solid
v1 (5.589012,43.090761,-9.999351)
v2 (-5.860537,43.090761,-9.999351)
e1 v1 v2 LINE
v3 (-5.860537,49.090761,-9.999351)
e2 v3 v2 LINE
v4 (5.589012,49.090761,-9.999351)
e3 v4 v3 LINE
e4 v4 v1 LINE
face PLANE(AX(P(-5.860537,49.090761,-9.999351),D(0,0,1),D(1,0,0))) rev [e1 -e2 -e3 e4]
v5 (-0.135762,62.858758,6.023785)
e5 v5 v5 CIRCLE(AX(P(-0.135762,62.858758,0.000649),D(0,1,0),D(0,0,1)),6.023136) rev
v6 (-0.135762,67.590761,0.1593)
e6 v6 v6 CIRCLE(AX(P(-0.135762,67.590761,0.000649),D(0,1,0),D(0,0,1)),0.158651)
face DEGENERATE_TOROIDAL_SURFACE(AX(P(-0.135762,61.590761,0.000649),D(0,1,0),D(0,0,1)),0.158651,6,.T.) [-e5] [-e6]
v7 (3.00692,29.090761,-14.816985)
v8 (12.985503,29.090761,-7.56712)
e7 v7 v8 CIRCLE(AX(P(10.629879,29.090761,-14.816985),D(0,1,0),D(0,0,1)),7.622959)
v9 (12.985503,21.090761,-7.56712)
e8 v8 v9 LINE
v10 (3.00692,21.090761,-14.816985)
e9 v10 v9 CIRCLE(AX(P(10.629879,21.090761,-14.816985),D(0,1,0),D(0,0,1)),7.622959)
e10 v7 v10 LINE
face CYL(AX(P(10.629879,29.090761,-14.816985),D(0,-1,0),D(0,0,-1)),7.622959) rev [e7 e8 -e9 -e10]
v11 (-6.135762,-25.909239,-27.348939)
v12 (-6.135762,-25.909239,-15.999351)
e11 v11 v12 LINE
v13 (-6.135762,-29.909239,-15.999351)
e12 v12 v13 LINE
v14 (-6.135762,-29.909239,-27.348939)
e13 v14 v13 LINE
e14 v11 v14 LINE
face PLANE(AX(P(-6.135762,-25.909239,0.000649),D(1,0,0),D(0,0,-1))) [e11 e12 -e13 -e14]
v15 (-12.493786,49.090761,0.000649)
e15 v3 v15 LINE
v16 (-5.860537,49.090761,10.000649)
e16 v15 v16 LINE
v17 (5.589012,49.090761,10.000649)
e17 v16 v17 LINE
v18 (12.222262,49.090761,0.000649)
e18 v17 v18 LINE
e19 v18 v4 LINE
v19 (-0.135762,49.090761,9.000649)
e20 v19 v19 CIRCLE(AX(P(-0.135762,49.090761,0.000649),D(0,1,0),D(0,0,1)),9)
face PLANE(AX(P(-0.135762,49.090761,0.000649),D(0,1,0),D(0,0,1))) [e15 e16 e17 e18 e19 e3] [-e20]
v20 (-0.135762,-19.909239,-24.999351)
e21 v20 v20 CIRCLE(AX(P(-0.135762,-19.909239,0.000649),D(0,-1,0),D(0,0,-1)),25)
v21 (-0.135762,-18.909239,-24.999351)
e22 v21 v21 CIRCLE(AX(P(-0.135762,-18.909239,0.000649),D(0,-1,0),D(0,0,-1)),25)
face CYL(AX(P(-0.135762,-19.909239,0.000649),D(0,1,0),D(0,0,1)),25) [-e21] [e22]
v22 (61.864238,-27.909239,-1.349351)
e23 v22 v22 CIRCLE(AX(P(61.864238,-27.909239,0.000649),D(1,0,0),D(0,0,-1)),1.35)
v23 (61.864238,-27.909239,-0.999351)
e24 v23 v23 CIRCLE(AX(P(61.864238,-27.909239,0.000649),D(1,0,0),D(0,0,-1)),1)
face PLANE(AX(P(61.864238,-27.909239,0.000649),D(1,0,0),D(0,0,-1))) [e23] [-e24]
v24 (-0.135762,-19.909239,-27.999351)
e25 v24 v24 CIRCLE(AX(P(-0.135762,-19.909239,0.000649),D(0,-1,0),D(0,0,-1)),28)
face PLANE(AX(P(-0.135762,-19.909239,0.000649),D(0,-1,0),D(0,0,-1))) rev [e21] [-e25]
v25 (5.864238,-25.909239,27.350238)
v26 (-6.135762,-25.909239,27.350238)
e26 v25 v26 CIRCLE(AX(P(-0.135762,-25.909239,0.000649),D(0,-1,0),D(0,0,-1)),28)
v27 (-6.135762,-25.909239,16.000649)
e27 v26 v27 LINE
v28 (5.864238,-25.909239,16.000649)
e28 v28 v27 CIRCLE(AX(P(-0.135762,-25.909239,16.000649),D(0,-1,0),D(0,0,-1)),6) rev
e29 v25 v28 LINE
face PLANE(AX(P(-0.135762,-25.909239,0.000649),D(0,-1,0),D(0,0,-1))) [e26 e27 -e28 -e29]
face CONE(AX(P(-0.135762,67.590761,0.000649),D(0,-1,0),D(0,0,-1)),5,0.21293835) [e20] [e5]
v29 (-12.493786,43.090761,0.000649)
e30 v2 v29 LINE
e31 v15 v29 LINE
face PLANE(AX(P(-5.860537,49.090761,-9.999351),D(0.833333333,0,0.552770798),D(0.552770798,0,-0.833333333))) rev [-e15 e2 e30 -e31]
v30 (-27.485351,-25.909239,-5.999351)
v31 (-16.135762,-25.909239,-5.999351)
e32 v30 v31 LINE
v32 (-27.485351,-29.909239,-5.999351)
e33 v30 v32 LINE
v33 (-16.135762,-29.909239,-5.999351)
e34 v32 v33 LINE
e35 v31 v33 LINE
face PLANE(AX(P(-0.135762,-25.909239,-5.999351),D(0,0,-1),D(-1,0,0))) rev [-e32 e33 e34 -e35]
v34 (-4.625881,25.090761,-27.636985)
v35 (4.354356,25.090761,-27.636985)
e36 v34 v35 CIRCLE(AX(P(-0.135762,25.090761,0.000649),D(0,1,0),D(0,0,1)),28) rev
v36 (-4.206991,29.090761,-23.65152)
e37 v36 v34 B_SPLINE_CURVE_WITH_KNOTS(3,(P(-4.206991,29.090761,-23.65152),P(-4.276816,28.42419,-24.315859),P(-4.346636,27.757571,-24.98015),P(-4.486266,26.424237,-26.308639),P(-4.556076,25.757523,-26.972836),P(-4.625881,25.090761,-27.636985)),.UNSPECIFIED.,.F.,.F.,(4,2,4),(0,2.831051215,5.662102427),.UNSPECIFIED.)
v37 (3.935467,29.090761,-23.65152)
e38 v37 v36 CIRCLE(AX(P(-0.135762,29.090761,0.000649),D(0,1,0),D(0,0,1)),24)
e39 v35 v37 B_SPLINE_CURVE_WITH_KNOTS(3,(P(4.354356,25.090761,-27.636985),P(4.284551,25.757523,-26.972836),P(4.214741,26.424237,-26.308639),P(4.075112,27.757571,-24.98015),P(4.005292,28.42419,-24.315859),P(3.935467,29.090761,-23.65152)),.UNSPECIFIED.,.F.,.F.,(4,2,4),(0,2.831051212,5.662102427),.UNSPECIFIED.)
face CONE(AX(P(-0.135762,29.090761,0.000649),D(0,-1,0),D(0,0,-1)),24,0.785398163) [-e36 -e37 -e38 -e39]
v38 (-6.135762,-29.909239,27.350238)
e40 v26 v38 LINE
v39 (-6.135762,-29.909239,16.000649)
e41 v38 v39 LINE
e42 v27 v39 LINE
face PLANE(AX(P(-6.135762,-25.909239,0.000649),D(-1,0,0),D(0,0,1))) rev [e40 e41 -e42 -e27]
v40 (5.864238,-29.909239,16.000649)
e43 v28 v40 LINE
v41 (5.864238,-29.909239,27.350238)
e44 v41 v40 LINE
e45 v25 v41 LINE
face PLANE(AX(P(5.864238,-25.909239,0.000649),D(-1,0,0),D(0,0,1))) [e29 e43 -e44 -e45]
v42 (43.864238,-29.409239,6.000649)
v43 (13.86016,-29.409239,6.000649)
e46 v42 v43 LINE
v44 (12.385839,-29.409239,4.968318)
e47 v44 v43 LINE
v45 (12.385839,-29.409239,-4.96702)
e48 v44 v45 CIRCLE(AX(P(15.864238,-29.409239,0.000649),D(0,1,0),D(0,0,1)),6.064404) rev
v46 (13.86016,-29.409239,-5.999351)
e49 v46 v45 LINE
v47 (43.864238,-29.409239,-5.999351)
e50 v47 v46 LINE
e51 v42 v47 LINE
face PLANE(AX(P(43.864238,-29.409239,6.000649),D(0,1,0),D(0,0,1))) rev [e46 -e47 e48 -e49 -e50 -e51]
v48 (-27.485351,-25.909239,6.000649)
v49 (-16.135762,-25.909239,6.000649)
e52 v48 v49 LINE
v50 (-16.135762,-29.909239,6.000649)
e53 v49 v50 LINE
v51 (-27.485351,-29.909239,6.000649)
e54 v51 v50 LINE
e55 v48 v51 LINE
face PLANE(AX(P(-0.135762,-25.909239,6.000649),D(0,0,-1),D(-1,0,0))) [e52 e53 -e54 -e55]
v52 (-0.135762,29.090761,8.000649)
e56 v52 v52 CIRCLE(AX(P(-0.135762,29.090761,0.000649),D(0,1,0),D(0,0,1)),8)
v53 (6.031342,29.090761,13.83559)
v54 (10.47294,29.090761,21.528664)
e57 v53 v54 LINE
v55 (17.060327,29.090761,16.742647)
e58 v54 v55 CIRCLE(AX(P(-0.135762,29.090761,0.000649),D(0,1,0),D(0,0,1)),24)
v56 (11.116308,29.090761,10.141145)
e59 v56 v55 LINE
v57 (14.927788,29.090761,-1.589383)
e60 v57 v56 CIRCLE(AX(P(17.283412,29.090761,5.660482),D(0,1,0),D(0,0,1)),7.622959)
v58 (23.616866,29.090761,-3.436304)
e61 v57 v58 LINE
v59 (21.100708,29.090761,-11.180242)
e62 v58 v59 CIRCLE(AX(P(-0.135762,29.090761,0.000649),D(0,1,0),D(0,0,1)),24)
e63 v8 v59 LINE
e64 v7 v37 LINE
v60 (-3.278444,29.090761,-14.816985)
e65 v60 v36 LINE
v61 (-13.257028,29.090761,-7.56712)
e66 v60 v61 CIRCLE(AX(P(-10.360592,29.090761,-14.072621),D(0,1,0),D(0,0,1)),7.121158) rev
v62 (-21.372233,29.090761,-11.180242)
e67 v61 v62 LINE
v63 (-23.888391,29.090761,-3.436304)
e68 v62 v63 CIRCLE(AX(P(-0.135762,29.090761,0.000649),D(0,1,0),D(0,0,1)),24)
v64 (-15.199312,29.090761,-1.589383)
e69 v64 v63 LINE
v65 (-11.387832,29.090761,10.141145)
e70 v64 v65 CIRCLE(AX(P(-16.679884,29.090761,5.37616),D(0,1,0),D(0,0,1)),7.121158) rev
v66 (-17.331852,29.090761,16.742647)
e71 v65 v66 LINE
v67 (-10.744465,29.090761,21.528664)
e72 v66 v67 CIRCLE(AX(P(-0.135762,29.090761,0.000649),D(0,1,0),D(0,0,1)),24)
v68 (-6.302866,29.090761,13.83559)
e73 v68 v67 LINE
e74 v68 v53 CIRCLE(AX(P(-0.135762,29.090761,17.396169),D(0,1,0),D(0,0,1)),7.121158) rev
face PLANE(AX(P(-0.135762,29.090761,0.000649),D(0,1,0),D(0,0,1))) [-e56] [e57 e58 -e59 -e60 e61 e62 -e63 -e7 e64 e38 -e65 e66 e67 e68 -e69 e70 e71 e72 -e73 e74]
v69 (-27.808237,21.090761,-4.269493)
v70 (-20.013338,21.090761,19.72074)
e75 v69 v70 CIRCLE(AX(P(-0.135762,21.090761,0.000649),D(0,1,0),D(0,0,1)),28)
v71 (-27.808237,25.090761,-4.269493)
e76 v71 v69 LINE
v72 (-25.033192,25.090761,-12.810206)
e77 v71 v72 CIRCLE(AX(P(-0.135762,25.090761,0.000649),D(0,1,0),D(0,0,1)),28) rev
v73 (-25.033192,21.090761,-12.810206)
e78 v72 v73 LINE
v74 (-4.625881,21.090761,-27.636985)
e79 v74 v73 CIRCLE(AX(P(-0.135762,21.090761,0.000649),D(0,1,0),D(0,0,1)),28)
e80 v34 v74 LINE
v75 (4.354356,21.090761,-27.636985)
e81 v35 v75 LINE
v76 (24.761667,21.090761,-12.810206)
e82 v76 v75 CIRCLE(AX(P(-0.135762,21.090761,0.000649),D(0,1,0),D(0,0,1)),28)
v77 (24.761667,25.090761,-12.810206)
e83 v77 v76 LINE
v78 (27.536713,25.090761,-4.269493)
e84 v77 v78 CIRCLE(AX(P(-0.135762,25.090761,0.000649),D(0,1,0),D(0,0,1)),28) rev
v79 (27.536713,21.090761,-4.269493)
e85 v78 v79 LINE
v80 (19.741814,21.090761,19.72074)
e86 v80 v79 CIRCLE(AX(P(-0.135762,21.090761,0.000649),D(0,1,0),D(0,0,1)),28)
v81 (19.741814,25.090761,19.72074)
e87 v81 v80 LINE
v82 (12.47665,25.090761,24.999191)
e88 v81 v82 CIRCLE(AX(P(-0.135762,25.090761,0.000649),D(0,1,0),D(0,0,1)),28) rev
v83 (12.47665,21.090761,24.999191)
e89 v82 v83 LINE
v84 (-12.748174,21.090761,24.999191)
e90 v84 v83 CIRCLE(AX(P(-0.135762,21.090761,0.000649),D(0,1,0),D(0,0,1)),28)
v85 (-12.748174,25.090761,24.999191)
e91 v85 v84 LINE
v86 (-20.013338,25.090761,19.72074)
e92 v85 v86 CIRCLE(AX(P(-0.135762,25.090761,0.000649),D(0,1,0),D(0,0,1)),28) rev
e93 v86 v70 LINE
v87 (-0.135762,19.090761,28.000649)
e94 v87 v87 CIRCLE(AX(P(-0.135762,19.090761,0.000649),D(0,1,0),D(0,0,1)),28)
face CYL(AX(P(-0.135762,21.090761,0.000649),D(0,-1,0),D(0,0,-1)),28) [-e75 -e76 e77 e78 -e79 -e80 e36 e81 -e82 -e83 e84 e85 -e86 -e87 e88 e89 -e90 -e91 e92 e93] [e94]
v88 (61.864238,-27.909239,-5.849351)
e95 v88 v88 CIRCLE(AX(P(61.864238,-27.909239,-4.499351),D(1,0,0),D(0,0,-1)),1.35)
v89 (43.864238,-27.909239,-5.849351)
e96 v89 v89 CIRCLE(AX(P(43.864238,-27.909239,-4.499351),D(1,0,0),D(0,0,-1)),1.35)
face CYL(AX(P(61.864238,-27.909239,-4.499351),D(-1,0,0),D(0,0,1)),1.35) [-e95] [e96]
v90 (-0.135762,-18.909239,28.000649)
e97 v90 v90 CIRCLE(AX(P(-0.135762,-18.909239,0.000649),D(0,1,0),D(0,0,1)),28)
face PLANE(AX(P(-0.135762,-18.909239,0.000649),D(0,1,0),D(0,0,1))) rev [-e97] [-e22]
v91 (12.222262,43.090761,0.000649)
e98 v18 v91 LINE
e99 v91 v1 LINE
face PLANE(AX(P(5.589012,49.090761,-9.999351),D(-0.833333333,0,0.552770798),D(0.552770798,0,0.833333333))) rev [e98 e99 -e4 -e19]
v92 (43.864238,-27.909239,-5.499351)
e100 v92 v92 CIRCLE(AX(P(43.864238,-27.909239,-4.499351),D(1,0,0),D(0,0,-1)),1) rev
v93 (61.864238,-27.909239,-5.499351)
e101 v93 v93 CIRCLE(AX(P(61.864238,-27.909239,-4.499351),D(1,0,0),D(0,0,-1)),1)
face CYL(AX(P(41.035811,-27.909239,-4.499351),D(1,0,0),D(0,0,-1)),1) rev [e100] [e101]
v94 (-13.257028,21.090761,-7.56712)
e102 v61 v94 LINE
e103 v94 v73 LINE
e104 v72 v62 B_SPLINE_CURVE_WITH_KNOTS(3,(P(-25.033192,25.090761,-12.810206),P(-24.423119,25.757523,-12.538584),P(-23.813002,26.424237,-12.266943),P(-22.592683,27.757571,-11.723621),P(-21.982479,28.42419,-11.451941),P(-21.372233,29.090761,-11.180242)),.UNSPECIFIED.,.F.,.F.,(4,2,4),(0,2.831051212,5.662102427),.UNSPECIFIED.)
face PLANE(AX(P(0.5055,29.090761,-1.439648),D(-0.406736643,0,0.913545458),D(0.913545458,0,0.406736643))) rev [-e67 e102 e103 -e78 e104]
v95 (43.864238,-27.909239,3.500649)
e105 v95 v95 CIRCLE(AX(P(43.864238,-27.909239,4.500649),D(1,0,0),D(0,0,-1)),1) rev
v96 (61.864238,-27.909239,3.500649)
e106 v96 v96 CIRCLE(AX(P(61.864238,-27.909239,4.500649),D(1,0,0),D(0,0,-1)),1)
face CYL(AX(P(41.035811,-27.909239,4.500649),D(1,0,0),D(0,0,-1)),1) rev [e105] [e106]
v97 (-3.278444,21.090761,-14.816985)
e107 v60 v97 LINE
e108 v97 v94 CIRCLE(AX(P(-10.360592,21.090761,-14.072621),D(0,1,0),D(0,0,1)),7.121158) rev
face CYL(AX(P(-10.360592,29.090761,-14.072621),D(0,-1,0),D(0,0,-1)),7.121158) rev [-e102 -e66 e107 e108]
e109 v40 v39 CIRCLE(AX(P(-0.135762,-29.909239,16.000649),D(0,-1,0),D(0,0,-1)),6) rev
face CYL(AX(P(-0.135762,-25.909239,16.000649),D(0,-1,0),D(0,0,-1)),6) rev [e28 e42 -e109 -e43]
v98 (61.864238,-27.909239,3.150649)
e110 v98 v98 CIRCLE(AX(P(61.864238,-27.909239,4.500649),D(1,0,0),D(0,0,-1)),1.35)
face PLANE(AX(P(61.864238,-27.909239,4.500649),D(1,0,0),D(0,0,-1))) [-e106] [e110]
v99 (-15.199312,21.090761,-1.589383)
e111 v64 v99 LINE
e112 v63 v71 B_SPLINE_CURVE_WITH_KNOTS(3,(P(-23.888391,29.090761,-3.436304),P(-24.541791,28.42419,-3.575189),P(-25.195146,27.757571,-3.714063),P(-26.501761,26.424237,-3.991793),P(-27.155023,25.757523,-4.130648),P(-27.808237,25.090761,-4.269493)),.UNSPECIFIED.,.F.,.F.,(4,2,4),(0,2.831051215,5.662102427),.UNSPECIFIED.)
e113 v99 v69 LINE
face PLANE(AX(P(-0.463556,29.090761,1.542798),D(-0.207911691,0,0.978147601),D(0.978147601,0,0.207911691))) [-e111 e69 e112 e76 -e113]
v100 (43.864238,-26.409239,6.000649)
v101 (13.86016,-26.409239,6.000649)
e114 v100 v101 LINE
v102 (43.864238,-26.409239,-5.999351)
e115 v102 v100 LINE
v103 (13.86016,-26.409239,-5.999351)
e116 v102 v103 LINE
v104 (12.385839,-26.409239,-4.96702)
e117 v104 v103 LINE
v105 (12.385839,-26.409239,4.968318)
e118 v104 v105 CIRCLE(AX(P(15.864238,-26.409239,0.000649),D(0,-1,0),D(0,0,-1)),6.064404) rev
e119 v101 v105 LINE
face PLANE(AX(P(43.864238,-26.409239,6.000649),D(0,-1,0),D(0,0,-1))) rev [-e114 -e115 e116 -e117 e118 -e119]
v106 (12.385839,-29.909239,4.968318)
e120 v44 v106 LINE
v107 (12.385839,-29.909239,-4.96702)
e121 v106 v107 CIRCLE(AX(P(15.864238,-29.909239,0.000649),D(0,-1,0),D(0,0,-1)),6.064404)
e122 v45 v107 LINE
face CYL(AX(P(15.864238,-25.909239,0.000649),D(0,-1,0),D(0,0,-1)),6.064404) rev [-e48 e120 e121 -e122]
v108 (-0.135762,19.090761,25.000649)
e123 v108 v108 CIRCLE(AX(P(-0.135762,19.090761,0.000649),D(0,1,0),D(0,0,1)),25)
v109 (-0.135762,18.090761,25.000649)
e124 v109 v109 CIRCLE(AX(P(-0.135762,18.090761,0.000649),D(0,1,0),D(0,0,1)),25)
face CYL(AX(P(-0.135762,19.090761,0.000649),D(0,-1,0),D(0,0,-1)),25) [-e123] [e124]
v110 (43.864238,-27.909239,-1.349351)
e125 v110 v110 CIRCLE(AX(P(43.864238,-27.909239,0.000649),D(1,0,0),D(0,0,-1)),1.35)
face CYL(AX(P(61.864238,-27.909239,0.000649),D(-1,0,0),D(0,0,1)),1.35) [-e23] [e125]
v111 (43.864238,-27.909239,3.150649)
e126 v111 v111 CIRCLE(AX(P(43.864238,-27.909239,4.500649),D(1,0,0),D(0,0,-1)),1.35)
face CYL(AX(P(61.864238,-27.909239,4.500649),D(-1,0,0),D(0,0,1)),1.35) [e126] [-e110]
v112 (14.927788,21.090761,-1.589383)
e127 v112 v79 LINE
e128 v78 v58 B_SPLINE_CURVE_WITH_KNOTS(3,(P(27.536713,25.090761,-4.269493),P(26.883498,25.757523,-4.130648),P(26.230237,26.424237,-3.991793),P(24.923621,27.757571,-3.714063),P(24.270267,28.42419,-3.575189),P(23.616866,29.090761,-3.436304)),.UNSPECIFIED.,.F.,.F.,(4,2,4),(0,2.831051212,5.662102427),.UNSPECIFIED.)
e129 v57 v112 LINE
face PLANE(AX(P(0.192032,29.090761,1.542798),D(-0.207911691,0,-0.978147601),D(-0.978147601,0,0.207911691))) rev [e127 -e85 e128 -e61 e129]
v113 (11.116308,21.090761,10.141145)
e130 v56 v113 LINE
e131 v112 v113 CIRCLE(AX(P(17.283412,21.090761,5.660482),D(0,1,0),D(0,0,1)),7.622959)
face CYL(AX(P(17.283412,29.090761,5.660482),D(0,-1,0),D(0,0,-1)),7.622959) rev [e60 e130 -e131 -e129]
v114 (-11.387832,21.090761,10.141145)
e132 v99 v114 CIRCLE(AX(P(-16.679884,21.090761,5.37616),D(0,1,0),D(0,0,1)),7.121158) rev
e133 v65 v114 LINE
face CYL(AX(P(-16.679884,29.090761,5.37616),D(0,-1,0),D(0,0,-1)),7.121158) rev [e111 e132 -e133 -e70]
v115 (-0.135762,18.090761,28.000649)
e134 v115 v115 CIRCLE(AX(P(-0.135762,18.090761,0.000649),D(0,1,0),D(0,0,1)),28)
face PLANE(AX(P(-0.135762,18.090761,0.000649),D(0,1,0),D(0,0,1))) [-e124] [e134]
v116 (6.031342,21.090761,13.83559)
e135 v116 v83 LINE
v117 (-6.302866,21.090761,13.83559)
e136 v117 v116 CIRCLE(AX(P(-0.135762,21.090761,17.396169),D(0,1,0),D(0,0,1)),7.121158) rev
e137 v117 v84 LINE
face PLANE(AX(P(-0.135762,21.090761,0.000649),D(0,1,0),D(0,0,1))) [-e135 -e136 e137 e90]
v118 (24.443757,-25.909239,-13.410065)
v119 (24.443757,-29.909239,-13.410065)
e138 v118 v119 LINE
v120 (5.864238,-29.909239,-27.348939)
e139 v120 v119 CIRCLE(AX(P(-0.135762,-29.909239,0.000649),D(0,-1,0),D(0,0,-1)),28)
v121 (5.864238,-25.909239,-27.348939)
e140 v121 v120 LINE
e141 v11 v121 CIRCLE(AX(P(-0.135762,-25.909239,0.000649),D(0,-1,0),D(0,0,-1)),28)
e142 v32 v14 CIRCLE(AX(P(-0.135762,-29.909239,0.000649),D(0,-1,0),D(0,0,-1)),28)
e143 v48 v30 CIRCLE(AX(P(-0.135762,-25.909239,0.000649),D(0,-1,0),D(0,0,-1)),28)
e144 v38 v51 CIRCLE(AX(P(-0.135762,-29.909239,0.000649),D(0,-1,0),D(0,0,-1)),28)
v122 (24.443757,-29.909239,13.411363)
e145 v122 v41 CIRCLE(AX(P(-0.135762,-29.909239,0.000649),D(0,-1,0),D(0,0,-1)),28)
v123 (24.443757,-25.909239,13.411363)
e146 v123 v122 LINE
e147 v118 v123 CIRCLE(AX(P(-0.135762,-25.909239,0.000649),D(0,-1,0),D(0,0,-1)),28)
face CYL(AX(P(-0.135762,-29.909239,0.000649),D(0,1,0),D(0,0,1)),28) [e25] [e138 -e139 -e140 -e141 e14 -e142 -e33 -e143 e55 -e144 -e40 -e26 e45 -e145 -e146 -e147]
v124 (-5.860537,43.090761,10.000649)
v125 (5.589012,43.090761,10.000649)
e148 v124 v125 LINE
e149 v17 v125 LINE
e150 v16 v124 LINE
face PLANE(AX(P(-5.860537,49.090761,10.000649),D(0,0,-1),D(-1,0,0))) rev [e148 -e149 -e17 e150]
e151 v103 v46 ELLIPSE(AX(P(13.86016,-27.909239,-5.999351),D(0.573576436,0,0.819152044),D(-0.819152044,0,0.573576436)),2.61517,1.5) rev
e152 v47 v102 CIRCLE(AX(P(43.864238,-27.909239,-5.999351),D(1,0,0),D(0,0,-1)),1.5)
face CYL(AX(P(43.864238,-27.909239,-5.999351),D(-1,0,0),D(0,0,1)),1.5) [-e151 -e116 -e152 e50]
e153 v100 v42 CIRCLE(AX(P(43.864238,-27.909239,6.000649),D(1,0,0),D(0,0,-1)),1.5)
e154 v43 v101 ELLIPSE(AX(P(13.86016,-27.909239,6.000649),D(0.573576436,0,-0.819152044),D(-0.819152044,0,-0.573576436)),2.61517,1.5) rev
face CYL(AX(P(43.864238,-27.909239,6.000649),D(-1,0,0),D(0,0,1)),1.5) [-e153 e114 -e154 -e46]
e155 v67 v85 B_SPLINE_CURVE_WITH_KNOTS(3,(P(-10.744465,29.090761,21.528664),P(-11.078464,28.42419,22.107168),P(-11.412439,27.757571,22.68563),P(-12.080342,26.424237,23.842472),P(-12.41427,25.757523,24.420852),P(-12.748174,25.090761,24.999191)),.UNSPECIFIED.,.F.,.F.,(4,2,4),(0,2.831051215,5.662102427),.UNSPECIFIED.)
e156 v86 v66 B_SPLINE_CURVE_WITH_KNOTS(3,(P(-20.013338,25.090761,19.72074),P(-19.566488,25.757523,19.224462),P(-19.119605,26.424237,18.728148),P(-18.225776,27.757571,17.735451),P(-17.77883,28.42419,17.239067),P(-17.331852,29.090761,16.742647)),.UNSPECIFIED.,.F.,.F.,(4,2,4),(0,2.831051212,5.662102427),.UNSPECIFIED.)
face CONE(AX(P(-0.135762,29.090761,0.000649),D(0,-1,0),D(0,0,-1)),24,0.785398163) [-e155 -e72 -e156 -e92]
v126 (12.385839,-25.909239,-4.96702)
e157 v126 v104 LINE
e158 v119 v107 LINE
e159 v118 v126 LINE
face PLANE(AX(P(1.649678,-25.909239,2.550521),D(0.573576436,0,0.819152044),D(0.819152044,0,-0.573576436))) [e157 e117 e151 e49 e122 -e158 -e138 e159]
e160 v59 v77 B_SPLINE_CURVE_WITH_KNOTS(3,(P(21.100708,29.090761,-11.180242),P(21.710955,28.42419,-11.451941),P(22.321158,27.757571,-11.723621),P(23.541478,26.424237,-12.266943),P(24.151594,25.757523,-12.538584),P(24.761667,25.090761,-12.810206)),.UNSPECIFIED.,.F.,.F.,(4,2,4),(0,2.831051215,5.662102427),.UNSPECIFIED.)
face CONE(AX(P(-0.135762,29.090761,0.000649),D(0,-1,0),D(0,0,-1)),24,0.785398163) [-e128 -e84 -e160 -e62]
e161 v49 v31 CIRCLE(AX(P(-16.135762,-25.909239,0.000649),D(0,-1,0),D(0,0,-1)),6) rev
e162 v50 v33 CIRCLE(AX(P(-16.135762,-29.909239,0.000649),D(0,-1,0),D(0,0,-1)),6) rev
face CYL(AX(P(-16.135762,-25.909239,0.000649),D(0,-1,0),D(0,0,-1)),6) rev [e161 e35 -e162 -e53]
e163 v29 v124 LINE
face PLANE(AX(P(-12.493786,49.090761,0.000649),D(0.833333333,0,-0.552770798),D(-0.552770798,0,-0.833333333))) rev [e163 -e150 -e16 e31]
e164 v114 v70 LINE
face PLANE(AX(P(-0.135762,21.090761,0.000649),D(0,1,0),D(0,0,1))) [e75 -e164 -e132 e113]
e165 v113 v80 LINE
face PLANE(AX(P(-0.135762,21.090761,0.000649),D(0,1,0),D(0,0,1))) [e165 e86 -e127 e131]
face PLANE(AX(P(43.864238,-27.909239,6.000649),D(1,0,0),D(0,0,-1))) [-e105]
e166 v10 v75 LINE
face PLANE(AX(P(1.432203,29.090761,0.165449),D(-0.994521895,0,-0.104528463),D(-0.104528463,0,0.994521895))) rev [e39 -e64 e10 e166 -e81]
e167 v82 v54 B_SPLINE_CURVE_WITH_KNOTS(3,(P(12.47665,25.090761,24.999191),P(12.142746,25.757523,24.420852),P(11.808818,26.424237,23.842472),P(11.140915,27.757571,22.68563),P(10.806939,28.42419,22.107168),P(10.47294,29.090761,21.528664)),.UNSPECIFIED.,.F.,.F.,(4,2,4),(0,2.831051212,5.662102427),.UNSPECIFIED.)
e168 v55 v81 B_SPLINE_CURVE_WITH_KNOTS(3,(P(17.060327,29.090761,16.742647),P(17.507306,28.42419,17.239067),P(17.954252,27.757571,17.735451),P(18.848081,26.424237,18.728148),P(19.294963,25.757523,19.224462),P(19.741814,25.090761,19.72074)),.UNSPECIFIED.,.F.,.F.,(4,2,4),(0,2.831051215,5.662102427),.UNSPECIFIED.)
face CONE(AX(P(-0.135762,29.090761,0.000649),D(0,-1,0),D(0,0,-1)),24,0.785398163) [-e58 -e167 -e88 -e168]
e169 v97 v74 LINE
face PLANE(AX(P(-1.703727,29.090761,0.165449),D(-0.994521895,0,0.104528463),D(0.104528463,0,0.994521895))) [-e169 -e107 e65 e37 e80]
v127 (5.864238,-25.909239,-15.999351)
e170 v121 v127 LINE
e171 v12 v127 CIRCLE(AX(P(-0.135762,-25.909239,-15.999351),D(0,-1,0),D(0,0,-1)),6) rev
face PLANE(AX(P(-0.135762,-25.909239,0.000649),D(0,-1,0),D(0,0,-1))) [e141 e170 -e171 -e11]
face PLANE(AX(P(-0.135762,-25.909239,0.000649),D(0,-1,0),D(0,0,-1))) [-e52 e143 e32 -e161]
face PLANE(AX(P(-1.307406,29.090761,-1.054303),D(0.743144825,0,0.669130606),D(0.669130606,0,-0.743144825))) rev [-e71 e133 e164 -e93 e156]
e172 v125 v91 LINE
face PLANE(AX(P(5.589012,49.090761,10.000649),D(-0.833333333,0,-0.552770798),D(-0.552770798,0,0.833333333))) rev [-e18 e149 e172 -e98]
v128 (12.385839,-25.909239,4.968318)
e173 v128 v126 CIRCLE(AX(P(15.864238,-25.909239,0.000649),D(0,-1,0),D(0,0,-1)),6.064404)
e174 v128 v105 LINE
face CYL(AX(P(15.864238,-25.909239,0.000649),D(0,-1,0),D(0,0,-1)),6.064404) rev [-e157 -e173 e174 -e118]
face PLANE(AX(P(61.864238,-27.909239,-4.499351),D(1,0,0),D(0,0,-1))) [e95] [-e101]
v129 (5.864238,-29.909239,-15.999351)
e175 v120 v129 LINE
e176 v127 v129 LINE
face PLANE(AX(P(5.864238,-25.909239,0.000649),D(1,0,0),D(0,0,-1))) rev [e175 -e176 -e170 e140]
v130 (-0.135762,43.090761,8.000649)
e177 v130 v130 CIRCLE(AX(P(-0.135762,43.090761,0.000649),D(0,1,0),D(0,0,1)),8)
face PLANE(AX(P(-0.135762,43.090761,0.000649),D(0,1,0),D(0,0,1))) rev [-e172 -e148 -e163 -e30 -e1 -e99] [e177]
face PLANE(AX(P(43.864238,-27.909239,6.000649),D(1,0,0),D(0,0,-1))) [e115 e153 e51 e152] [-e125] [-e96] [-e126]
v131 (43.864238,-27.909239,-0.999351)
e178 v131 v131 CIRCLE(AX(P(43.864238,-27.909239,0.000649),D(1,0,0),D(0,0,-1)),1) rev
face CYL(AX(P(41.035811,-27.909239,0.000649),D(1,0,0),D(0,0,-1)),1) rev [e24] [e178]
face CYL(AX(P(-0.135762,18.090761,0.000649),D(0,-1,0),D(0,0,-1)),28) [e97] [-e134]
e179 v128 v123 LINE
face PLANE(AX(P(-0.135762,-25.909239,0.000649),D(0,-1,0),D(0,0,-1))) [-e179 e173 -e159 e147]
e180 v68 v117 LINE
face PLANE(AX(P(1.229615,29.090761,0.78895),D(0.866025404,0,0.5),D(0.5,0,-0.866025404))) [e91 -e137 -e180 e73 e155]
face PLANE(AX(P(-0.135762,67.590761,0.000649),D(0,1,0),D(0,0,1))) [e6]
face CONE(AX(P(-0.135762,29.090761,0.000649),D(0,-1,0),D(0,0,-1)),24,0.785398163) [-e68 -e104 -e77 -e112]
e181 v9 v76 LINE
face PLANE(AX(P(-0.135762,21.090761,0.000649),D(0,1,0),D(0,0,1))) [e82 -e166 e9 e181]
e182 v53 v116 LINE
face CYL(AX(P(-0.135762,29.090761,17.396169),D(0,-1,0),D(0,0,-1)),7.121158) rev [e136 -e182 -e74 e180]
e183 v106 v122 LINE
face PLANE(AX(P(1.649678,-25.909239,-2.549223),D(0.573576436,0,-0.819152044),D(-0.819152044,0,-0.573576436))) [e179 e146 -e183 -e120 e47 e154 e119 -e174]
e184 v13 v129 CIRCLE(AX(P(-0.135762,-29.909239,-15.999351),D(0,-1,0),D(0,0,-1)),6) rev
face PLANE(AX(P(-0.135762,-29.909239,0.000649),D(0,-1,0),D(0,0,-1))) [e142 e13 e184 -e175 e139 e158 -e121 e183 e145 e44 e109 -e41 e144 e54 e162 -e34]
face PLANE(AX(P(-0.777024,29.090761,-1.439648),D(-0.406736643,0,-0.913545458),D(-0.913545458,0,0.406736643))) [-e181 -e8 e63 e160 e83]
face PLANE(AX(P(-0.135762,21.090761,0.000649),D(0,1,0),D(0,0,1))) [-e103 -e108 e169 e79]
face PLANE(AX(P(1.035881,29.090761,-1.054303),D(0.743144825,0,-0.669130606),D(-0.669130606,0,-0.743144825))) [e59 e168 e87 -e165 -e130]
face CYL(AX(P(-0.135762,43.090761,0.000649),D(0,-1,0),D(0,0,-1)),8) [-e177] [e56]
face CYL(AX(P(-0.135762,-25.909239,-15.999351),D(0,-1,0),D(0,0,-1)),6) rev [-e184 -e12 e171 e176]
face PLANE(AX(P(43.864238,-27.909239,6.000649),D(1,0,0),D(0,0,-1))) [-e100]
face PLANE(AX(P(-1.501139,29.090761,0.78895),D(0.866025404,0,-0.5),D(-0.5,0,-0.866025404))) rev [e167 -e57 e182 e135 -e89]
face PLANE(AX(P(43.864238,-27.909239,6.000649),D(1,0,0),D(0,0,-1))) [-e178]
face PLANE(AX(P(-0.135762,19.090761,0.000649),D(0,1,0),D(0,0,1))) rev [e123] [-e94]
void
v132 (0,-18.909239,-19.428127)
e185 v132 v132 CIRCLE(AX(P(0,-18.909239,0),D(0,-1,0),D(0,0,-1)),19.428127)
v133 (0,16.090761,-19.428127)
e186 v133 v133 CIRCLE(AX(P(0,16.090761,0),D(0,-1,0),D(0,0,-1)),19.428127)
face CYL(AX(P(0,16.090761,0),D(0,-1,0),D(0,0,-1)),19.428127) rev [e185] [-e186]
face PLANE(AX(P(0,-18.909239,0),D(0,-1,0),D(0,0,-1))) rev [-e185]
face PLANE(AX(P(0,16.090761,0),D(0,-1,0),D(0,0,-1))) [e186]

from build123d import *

# Parameters (mm, degrees)
SKETCH1_R                = 14
BOSS_EXTRUDE1_DEPTH      = 9.25
SKETCH2_R                = 12.5
BOSS_EXTRUDE2_DEPTH      = 0.5
BOSS_EXTRUDE3_START      = 0.5
SKETCH3_R                = 12.5
BOSS_EXTRUDE3_DEPTH      = 0.5
SKETCH4_R                = 14
BOSS_EXTRUDE4_DEPTH      = 5
BOSS_EXTRUDE5_START      = 1
SKETCH5_R                = 14
BOSS_EXTRUDE5_DEPTH      = 1
BOSS_EXTRUDE6_START      = 4
SKETCH6_R                = 4
BOSS_EXTRUDE6_DEPTH      = 4
BOSS_EXTRUDE7_START      = 11
SKETCH7_R                = 4
BOSS_EXTRUDE7_DEPTH      = 11
FILLET4_SIZE             = 2
BOSS_EXTRUDE8_DEPTH      = 3
SKETCH10_R               = 4.5
SKETCH9_R                = 2.5
FILLET5_R                = 3
CUT_EXTRUDE1_START       = -2
CUT_EXTRUDE1_DEPTH       = 2
BOSS_EXTRUDE9_DEPTH      = 8
BOSS_EXTRUDE9_DEPTH_BACK = 17
SKETCH16_R               = 0.675
BOSS_EXTRUDE10_DEPTH     = 9
SKETCH18_R               = 0.5
CUT_EXTRUDE2_DEPTH       = 9
SCALE1_SCALE             = 2
SKETCH19_R               = 19.428126758
CUT_EXTRUDE3_DEPTH       = 35


with BuildPart() as part:
    # Sketch1 → Boss-Extrude1 (new, symmetric)
    with BuildSketch(Plane(origin=(0, 0, 0), x_dir=(1, 0, 0), z_dir=(0, 1, 0))):
        with Locations(Location((0, 0, 0), (0, 0, 270))):
            Circle(SKETCH1_R)
    extrude(amount=BOSS_EXTRUDE1_DEPTH, both=True)

    # Sketch2 → Boss-Extrude2 (add)
    with BuildSketch(Plane(origin=(0, 9.25, 0), x_dir=(1, 0, 0), z_dir=(0, 1, 0))):
        with Locations(Location((0, 0, 0), (0, 0, 270))):
            Circle(SKETCH2_R)
    extrude(amount=BOSS_EXTRUDE2_DEPTH)

    # Sketch3 → Boss-Extrude3 (add)
    with BuildSketch(Plane.XZ.offset(9.25).offset(BOSS_EXTRUDE3_START)):
        with Locations(Location((0, 0, 0), (0, 0, 90))):
            Circle(SKETCH3_R)
    extrude(amount=-BOSS_EXTRUDE3_DEPTH)

    # Sketch4 → Boss-Extrude4 (add)
    with BuildSketch(Plane.XZ.offset(9.75)):
        with Locations(Location((0, 0, 0), (0, 0, 90))):
            Circle(SKETCH4_R)
    extrude(amount=BOSS_EXTRUDE4_DEPTH)

    # Sketch5 → Boss-Extrude5 (add)
    with BuildSketch(Plane(origin=(0, 9.75, 0), x_dir=(1, 0, 0), z_dir=(0, 1, 0)).offset(BOSS_EXTRUDE5_START)):
        with Locations(Location((0, 0, 0), (0, 0, 270))):
            Circle(SKETCH5_R)
    extrude(amount=-BOSS_EXTRUDE5_DEPTH)

    # Sketch6 → Boss-Extrude6 (add)
    with BuildSketch(Plane(origin=(0, 10.75, 0), x_dir=(1, 0, 0), z_dir=(0, 1, 0)).offset(BOSS_EXTRUDE6_START)):
        with BuildLine():
            ThreePointArc((6.560632788, 3.783884599), (3.142489225, 4.325265354), (1.571341079, 7.408817209))
            Line((1.571341079, 7.408817209), (2.245059227, 13.818817209))
            ThreePointArc((2.245059227, 13.818817209), (0, 14), (-2.245059227, 13.818817209))
            Line((-2.245059227, 13.818817209), (-1.571341079, 7.408817209))
            ThreePointArc((-1.571341079, 7.408817209), (-3.019559024, 4.156066449), (-6.560632788, 3.783884599))
            Line((-6.560632788, 3.783884599), (-12.4487147, 6.405427568))
            ThreePointArc((-12.4487147, 6.405427568), (-13.314791228, 4.326237921), (-13.836237609, 2.135071152))
            Line((-13.836237609, 2.135071152), (-7.531774982, 0.795016253))
            ThreePointArc((-7.531774982, 0.795016253), (-4.885749132, -1.587476124), (-5.62603513, -5.070247918))
            Line((-5.62603513, -5.070247918), (-9.938788028, -9.86004526))
            ThreePointArc((-9.938788028, -9.86004526), (-8.228993532, -11.326237921), (-6.306205891, -12.499270669))
            Line((-6.306205891, -12.499270669), (-3.083551855, -6.917470143))
            ThreePointArc((-3.083551855, -6.917470143), (0, -5.13718065), (3.083551855, -6.917470143))
            Line((3.083551855, -6.917470143), (6.306205891, -12.499270669))
            ThreePointArc((6.306205891, -12.499270669), (8.228993532, -11.326237921), (9.938788028, -9.86004526))
            Line((9.938788028, -9.86004526), (5.62603513, -5.070247918))
            ThreePointArc((5.62603513, -5.070247918), (5.084654375, -1.652104355), (7.531774982, 0.795016253))
            Line((7.531774982, 0.795016253), (13.836237609, 2.135071152))
            ThreePointArc((13.836237609, 2.135071152), (13.314791228, 4.326237921), (12.4487147, 6.405427568))
            Line((12.4487147, 6.405427568), (6.560632788, 3.783884599))
        make_face()
        with Locations(Location((0, 0, 0), (0, 0, 270))):
            Circle(SKETCH6_R, mode=Mode.SUBTRACT)
    extrude(amount=-BOSS_EXTRUDE6_DEPTH)

    # Sketch7 → Boss-Extrude7 (add)
    with BuildSketch(Plane(origin=(0, 10.75, 0), x_dir=(1, 0, 0), z_dir=(0, 1, 0)).offset(BOSS_EXTRUDE7_START)):
        with Locations(Location((0, 0, 0), (0, 0, 270))):
            Circle(SKETCH7_R)
    extrude(amount=-BOSS_EXTRUDE7_DEPTH)

    # Fillet4
    fillet4_edges = [part.edges().sort_by_distance(p)[0] for p in [
        (0, 14.75, -14),
        (-13.314791228, 14.75, -4.326237921),
        (-8.228993532, 14.75, 11.326237921),
        (8.228993532, 14.75, 11.326237921),
        (13.314791228, 14.75, -4.326237921),
    ]]
    chamfer(fillet4_edges, length=FILLET4_SIZE)

    # Sketch8 → Boss-Extrude8 (add)
    with BuildSketch(Plane(origin=(0, 21.75, 0), x_dir=(1, 0, 0), z_dir=(0, 1, 0))):
        Polygon((-2.862387208, 5), (2.862387208, 5), (6.179011998, 0), (2.862387208, -5), (-2.862387208, -5), (-6.179011998, 0), align=None)
    extrude(amount=BOSS_EXTRUDE8_DEPTH)

    # Sketch10 → Loft1 section 0
    with BuildSketch(Plane(origin=(0, 24.75, 0), x_dir=(1, 0, 0), z_dir=(0, 1, 0))):
        Circle(SKETCH10_R)
    # Sketch9 → Loft1 section 1
    with BuildSketch(Plane(origin=(0, 34, 0), x_dir=(1, 0, 0), z_dir=(0, 1, 0))):
        Circle(SKETCH9_R)
    loft()

    # Fillet5
    fillet5_edges = [part.edges().sort_by_distance(p)[0] for p in [
        (-2.5, 34, 0),
    ]]
    fillet(fillet5_edges, radius=FILLET5_R)

    # Sketch12 → Cut-Extrude1 (cut)
    with BuildSketch(Plane.XZ.offset(14.75).offset(CUT_EXTRUDE1_START)):
        with BuildLine():
            ThreePointArc((3, 13.674794331), (0, 14), (-3, 13.674794331))
            Line((-3, 13.674794331), (-3, 8))
            ThreePointArc((-3, 8), (0, 5), (3, 8))
            Line((3, 8), (3, 13.674794331))
        make_face()
        with BuildLine():
            Line((-8, 3), (-13.674794331, 3))
            ThreePointArc((-13.674794331, 3), (-14, 0), (-13.674794331, -3))
            Line((-13.674794331, -3), (-8, -3))
            ThreePointArc((-8, -3), (-5, 0), (-8, 3))
        make_face()
        with BuildLine():
            Line((12.289759461, 6.705356992), (6.260800415, 2.483834421))
            ThreePointArc((6.260800415, 2.483834421), (4.967798056, 0), (6.260800415, -2.483834421))
            Line((6.260800415, -2.483834421), (12.289759461, -6.705356992))
            ThreePointArc((12.289759461, -6.705356992), (14, 0), (12.289759461, 6.705356992))
        make_face()
        with BuildLine():
            Line((-3, -8), (-3, -13.674794331))
            ThreePointArc((-3, -13.674794331), (0, -14), (3, -13.674794331))
            Line((3, -13.674794331), (3, -8))
            ThreePointArc((3, -8), (0, -5), (-3, -8))
        make_face()
    extrude(amount=CUT_EXTRUDE1_DEPTH, mode=Mode.SUBTRACT)

    # Sketch14 → Boss-Extrude9 (add, two sides: drawn at the far end of the back side and taken through both)
    with BuildSketch(Plane(origin=(14, 0, 0), x_dir=(0, 0, -1), z_dir=(1, 0, 0)).offset(-BOSS_EXTRUDE9_DEPTH_BACK)):
        with BuildLine():
            Line((-3, -13), (3, -13))
            ThreePointArc((3, -13), (3.75, -13.75), (3, -14.5))
            Line((3, -14.5), (-3, -14.5))
            ThreePointArc((-3, -14.5), (-3.75, -13.75), (-3, -13))
        make_face()
    extrude(amount=BOSS_EXTRUDE9_DEPTH + BOSS_EXTRUDE9_DEPTH_BACK)

    # Sketch16 → Boss-Extrude10 (add)
    with BuildSketch(Plane(origin=(22, 0, 0), x_dir=(0, 0, -1), z_dir=(1, 0, 0))):
        with Locations((-2.25, -13.75)):
            Circle(SKETCH16_R)
        with Locations((0, -13.75)):
            Circle(SKETCH16_R)
        with Locations((2.25, -13.75)):
            Circle(SKETCH16_R)
    extrude(amount=BOSS_EXTRUDE10_DEPTH)

    # Sketch18 → Cut-Extrude2 (cut)
    with BuildSketch(Plane(origin=(31, 0, 0), x_dir=(0, 0, -1), z_dir=(1, 0, 0))):
        with Locations((-2.25, -13.75)):
            Circle(SKETCH18_R)
        with Locations((2.25, -13.75)):
            Circle(SKETCH18_R)
        with Locations((0, -13.75)):
            Circle(SKETCH18_R)
    extrude(amount=-CUT_EXTRUDE2_DEPTH, mode=Mode.SUBTRACT)


with BuildPart() as part_1:
    # Scale1: scaled about (0.135762453, 0.409238593, -0.000649103)
    add(part.part.scale(SCALE1_SCALE).moved(Location((-0.135762453, -0.409238593, 0.000649103))))

    # Sketch19 → Cut-Extrude3 (cut)
    with BuildSketch(Plane.XZ.offset(18.90923893)):
        with Locations(Location((0, 0, 0), (0, 0, 270))):
            Circle(SKETCH19_R)
    extrude(amount=-CUT_EXTRUDE3_DEPTH, mode=Mode.SUBTRACT)


solid = part_1.part
